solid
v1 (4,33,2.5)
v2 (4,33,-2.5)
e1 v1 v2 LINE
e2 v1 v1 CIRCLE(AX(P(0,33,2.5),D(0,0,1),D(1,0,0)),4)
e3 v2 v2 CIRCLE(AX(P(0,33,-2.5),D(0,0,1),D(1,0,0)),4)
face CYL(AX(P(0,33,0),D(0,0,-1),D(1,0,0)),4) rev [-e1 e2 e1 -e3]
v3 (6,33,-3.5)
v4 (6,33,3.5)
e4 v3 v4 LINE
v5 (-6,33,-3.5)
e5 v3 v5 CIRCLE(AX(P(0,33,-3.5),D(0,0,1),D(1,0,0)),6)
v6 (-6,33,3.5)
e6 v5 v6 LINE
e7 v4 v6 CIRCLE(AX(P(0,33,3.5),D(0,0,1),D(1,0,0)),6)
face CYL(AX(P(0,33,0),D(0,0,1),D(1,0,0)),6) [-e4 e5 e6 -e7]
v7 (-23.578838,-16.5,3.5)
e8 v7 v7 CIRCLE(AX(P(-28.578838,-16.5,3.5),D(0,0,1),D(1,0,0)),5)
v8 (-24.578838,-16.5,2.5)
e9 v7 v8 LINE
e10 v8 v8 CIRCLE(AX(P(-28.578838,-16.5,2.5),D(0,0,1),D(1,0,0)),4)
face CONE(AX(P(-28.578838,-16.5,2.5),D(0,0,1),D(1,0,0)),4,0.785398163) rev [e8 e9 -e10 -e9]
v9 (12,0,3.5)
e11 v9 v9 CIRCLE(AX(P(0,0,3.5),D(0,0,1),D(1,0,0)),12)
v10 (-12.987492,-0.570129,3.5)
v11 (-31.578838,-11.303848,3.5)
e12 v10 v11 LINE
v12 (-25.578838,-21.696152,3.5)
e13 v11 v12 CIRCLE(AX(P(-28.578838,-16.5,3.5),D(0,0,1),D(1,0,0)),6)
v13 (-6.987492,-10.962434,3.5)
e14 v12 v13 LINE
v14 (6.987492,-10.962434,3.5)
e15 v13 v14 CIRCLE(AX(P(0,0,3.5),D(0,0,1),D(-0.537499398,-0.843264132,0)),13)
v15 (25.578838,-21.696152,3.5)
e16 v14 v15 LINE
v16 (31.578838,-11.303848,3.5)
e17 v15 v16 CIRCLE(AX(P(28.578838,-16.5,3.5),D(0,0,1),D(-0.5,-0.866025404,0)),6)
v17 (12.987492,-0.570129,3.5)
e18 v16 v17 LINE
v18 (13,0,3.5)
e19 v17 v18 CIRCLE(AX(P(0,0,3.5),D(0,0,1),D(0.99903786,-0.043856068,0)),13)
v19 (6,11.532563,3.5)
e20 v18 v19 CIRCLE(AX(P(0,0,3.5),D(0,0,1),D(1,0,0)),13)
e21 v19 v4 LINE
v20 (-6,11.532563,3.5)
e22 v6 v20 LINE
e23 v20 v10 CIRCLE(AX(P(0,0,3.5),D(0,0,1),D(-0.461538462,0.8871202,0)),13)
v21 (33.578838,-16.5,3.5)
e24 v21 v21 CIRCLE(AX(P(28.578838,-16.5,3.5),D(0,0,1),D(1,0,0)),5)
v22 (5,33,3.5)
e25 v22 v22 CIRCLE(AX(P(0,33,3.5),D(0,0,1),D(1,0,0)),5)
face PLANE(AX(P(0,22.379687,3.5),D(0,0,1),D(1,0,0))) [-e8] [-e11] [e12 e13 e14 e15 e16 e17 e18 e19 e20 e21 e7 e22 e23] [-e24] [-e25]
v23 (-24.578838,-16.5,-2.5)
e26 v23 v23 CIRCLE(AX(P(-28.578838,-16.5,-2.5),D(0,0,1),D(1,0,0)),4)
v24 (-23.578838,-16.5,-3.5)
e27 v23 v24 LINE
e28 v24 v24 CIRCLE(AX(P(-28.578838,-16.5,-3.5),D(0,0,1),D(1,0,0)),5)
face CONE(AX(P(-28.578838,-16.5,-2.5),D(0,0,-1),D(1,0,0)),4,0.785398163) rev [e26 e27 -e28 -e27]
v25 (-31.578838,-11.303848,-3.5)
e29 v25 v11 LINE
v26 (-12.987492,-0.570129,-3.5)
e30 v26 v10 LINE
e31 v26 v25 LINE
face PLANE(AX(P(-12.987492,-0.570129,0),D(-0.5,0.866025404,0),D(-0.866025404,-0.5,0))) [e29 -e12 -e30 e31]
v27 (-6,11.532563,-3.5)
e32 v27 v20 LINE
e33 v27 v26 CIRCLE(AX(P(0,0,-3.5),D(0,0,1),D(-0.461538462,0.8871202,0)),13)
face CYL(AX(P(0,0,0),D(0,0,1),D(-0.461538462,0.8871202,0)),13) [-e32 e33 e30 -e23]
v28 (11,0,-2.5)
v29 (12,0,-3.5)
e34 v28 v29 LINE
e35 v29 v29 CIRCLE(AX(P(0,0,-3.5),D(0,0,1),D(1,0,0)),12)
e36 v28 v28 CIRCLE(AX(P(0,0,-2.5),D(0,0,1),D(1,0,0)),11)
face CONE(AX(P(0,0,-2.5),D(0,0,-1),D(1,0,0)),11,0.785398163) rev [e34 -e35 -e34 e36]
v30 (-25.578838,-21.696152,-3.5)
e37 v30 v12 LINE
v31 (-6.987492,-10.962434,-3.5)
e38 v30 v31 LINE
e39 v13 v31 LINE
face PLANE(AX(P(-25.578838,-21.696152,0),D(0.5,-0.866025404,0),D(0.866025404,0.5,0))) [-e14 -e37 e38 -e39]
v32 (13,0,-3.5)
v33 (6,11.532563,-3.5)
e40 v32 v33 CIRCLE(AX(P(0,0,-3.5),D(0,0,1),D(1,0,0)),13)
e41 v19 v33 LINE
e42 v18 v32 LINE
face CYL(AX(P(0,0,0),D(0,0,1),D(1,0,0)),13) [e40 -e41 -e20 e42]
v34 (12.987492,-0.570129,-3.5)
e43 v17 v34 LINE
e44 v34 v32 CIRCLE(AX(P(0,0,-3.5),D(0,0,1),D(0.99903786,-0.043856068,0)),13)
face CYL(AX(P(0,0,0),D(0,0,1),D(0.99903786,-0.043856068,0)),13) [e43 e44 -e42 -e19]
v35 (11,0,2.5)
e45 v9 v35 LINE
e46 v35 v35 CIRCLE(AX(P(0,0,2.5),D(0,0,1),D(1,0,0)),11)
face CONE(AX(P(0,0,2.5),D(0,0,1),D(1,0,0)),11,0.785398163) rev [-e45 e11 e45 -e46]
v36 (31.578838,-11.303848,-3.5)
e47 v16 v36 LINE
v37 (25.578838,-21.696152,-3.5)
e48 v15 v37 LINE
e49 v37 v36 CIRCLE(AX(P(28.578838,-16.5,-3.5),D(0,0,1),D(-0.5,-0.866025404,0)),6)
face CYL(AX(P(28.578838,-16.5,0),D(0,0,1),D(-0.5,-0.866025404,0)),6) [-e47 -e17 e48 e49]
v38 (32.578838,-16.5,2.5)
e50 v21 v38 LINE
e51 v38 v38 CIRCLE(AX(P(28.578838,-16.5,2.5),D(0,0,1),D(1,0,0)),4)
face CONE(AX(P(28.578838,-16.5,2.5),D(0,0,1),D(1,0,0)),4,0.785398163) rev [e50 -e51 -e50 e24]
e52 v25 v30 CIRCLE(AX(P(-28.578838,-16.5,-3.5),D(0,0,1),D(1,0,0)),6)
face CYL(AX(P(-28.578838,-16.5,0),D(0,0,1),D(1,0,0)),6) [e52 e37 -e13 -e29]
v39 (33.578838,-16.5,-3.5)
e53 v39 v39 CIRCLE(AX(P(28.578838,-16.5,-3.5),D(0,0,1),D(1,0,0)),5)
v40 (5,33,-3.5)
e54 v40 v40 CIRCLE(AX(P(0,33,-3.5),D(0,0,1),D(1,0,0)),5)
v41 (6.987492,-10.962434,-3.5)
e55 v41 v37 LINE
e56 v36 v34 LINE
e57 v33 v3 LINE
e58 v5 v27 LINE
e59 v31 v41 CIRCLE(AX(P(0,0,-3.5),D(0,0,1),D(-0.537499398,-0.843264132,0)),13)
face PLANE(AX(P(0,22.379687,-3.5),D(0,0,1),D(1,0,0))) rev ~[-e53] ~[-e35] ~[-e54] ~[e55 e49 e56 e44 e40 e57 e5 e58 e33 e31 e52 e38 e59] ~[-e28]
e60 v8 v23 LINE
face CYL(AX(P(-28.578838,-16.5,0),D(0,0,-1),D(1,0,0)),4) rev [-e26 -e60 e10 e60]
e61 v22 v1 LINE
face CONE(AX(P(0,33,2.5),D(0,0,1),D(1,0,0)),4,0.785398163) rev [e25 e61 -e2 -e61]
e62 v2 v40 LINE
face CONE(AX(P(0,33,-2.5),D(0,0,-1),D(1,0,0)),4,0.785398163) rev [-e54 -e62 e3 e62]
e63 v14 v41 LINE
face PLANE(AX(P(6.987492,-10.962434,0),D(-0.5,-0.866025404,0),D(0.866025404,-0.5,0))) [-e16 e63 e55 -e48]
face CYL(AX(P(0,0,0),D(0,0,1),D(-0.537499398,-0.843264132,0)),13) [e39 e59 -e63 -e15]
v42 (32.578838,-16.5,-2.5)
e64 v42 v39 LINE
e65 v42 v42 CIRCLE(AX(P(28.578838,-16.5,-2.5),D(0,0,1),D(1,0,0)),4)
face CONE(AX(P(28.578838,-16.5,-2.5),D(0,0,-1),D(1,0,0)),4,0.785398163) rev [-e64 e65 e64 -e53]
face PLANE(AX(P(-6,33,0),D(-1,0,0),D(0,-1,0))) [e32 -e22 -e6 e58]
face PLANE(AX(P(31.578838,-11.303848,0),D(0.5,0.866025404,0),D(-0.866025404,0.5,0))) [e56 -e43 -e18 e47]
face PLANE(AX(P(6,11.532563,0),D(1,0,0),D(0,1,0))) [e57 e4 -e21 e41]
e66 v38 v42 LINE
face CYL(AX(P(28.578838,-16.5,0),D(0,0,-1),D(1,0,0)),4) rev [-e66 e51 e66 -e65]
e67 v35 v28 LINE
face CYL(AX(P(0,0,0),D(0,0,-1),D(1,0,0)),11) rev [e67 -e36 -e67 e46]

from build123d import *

# Parameters (mm, degrees)
F0_R     = 11
F0_R_2   = 4
F1_DEPTH = 3.5
F2_SIZE  = 1


# Not quite as in the source:
# - a feature names something its author has since deleted; it is built from what else it names


with BuildPart() as f1:
    # F0 (on Top) → F1 (new body, symmetric)
    with BuildSketch(Plane.XY):
        with BuildLine():
            ThreePointArc((-6, 11.5325625947), (0, 13), (6, 11.5325625947))
            Line((6, 11.5325625947), (6, 33))
            ThreePointArc((6, 33), (0, 27), (-6, 33))
            Line((-6, 33), (-6, 11.5325625947))
        make_face()
        with BuildLine():
            ThreePointArc((-6.9874921777, -10.96243372), (-11.2583302492, -6.5), (-12.9874921777, -0.5701288746))
            Line((-12.9874921777, -0.5701288746), (-31.5788383249, -11.3038475773))
            ThreePointArc((-31.5788383249, -11.3038475773), (-25.5788383249, -11.3038475773), (-22.5788383249, -16.5))
            ThreePointArc((-22.5788383249, -16.5), (-23.3826859022, -19.5), (-25.5788383249, -21.6961524227))
            Line((-25.5788383249, -21.6961524227), (-6.9874921777, -10.96243372))
        make_face()
        with BuildLine():
            Line((31.5788383249, -11.3038475773), (12.9874921777, -0.5701288746))
            ThreePointArc((12.9874921777, -0.5701288746), (11.2583302492, -6.5), (6.9874921777, -10.96243372))
            Line((6.9874921777, -10.96243372), (25.5788383249, -21.6961524227))
            ThreePointArc((25.5788383249, -21.6961524227), (23.3826859022, -13.5), (31.5788383249, -11.3038475773))
        make_face()
        with BuildLine():
            ThreePointArc((12.9874921777, -0.5701288746), (12.9968726683, -0.2851330301), (13, 0))
            ThreePointArc((13, 0), (11.1130553854, 6.7453687816), (6, 11.5325625947))
            ThreePointArc((6, 11.5325625947), (0, 13), (-6, 11.5325625947))
            ThreePointArc((-6, 11.5325625947), (-11.2583302492, 6.5), (-12.9874921777, -0.5701288746))
            ThreePointArc((-12.9874921777, -0.5701288746), (-11.2583302492, -6.5), (-6.9874921777, -10.96243372))
            ThreePointArc((-6.9874921777, -10.96243372), (0, -13), (6.9874921777, -10.96243372))
            ThreePointArc((6.9874921777, -10.96243372), (11.2583302492, -6.5), (12.9874921777, -0.5701288746))
        make_face()
        Circle(F0_R, mode=Mode.SUBTRACT)
        with BuildLine():
            ThreePointArc((-6, 33), (0, 27), (6, 33))
            ThreePointArc((6, 33), (0, 39), (-6, 33))
        make_face()
        with Locations((0, 33)):
            Circle(F0_R_2, mode=Mode.SUBTRACT)
        with BuildLine():
            ThreePointArc((-22.5788383249, -16.5), (-25.5788383249, -11.3038475773), (-31.5788383249, -11.3038475773))
            ThreePointArc((-31.5788383249, -11.3038475773), (-33.7749907476, -19.5), (-25.5788383249, -21.6961524227))
            ThreePointArc((-25.5788383249, -21.6961524227), (-23.3826859022, -19.5), (-22.5788383249, -16.5))
        make_face()
        with Locations((-28.5788383249, -16.5)):
            Circle(F0_R_2, mode=Mode.SUBTRACT)
        with BuildLine():
            ThreePointArc((34.5788383249, -16.5), (33.7749907476, -13.5), (31.5788383249, -11.3038475773))
            ThreePointArc((31.5788383249, -11.3038475773), (23.3826859022, -13.5), (25.5788383249, -21.6961524227))
            ThreePointArc((25.5788383249, -21.6961524227), (31.5788383249, -21.6961524227), (34.5788383249, -16.5))
        make_face()
        with Locations((28.5788383249, -16.5)):
            Circle(F0_R_2, mode=Mode.SUBTRACT)
    extrude(amount=F1_DEPTH, both=True)

    # F2
    f2_edges = [f1.edges().sort_by_distance(p)[0] for p in [
        (-4, 33, 3.5),
        (-11, 0, 3.5),
        (-32.578838, -16.5, 3.5),
        (24.578838, -16.5, 3.5),
        (-32.578838, -16.5, -3.5),
        (-11, 0, -3.5),
        (24.578838, -16.5, -3.5),
        (-4, 33, -3.5),
    ]]
    chamfer(f2_edges, length=F2_SIZE)


solid = f1.part
